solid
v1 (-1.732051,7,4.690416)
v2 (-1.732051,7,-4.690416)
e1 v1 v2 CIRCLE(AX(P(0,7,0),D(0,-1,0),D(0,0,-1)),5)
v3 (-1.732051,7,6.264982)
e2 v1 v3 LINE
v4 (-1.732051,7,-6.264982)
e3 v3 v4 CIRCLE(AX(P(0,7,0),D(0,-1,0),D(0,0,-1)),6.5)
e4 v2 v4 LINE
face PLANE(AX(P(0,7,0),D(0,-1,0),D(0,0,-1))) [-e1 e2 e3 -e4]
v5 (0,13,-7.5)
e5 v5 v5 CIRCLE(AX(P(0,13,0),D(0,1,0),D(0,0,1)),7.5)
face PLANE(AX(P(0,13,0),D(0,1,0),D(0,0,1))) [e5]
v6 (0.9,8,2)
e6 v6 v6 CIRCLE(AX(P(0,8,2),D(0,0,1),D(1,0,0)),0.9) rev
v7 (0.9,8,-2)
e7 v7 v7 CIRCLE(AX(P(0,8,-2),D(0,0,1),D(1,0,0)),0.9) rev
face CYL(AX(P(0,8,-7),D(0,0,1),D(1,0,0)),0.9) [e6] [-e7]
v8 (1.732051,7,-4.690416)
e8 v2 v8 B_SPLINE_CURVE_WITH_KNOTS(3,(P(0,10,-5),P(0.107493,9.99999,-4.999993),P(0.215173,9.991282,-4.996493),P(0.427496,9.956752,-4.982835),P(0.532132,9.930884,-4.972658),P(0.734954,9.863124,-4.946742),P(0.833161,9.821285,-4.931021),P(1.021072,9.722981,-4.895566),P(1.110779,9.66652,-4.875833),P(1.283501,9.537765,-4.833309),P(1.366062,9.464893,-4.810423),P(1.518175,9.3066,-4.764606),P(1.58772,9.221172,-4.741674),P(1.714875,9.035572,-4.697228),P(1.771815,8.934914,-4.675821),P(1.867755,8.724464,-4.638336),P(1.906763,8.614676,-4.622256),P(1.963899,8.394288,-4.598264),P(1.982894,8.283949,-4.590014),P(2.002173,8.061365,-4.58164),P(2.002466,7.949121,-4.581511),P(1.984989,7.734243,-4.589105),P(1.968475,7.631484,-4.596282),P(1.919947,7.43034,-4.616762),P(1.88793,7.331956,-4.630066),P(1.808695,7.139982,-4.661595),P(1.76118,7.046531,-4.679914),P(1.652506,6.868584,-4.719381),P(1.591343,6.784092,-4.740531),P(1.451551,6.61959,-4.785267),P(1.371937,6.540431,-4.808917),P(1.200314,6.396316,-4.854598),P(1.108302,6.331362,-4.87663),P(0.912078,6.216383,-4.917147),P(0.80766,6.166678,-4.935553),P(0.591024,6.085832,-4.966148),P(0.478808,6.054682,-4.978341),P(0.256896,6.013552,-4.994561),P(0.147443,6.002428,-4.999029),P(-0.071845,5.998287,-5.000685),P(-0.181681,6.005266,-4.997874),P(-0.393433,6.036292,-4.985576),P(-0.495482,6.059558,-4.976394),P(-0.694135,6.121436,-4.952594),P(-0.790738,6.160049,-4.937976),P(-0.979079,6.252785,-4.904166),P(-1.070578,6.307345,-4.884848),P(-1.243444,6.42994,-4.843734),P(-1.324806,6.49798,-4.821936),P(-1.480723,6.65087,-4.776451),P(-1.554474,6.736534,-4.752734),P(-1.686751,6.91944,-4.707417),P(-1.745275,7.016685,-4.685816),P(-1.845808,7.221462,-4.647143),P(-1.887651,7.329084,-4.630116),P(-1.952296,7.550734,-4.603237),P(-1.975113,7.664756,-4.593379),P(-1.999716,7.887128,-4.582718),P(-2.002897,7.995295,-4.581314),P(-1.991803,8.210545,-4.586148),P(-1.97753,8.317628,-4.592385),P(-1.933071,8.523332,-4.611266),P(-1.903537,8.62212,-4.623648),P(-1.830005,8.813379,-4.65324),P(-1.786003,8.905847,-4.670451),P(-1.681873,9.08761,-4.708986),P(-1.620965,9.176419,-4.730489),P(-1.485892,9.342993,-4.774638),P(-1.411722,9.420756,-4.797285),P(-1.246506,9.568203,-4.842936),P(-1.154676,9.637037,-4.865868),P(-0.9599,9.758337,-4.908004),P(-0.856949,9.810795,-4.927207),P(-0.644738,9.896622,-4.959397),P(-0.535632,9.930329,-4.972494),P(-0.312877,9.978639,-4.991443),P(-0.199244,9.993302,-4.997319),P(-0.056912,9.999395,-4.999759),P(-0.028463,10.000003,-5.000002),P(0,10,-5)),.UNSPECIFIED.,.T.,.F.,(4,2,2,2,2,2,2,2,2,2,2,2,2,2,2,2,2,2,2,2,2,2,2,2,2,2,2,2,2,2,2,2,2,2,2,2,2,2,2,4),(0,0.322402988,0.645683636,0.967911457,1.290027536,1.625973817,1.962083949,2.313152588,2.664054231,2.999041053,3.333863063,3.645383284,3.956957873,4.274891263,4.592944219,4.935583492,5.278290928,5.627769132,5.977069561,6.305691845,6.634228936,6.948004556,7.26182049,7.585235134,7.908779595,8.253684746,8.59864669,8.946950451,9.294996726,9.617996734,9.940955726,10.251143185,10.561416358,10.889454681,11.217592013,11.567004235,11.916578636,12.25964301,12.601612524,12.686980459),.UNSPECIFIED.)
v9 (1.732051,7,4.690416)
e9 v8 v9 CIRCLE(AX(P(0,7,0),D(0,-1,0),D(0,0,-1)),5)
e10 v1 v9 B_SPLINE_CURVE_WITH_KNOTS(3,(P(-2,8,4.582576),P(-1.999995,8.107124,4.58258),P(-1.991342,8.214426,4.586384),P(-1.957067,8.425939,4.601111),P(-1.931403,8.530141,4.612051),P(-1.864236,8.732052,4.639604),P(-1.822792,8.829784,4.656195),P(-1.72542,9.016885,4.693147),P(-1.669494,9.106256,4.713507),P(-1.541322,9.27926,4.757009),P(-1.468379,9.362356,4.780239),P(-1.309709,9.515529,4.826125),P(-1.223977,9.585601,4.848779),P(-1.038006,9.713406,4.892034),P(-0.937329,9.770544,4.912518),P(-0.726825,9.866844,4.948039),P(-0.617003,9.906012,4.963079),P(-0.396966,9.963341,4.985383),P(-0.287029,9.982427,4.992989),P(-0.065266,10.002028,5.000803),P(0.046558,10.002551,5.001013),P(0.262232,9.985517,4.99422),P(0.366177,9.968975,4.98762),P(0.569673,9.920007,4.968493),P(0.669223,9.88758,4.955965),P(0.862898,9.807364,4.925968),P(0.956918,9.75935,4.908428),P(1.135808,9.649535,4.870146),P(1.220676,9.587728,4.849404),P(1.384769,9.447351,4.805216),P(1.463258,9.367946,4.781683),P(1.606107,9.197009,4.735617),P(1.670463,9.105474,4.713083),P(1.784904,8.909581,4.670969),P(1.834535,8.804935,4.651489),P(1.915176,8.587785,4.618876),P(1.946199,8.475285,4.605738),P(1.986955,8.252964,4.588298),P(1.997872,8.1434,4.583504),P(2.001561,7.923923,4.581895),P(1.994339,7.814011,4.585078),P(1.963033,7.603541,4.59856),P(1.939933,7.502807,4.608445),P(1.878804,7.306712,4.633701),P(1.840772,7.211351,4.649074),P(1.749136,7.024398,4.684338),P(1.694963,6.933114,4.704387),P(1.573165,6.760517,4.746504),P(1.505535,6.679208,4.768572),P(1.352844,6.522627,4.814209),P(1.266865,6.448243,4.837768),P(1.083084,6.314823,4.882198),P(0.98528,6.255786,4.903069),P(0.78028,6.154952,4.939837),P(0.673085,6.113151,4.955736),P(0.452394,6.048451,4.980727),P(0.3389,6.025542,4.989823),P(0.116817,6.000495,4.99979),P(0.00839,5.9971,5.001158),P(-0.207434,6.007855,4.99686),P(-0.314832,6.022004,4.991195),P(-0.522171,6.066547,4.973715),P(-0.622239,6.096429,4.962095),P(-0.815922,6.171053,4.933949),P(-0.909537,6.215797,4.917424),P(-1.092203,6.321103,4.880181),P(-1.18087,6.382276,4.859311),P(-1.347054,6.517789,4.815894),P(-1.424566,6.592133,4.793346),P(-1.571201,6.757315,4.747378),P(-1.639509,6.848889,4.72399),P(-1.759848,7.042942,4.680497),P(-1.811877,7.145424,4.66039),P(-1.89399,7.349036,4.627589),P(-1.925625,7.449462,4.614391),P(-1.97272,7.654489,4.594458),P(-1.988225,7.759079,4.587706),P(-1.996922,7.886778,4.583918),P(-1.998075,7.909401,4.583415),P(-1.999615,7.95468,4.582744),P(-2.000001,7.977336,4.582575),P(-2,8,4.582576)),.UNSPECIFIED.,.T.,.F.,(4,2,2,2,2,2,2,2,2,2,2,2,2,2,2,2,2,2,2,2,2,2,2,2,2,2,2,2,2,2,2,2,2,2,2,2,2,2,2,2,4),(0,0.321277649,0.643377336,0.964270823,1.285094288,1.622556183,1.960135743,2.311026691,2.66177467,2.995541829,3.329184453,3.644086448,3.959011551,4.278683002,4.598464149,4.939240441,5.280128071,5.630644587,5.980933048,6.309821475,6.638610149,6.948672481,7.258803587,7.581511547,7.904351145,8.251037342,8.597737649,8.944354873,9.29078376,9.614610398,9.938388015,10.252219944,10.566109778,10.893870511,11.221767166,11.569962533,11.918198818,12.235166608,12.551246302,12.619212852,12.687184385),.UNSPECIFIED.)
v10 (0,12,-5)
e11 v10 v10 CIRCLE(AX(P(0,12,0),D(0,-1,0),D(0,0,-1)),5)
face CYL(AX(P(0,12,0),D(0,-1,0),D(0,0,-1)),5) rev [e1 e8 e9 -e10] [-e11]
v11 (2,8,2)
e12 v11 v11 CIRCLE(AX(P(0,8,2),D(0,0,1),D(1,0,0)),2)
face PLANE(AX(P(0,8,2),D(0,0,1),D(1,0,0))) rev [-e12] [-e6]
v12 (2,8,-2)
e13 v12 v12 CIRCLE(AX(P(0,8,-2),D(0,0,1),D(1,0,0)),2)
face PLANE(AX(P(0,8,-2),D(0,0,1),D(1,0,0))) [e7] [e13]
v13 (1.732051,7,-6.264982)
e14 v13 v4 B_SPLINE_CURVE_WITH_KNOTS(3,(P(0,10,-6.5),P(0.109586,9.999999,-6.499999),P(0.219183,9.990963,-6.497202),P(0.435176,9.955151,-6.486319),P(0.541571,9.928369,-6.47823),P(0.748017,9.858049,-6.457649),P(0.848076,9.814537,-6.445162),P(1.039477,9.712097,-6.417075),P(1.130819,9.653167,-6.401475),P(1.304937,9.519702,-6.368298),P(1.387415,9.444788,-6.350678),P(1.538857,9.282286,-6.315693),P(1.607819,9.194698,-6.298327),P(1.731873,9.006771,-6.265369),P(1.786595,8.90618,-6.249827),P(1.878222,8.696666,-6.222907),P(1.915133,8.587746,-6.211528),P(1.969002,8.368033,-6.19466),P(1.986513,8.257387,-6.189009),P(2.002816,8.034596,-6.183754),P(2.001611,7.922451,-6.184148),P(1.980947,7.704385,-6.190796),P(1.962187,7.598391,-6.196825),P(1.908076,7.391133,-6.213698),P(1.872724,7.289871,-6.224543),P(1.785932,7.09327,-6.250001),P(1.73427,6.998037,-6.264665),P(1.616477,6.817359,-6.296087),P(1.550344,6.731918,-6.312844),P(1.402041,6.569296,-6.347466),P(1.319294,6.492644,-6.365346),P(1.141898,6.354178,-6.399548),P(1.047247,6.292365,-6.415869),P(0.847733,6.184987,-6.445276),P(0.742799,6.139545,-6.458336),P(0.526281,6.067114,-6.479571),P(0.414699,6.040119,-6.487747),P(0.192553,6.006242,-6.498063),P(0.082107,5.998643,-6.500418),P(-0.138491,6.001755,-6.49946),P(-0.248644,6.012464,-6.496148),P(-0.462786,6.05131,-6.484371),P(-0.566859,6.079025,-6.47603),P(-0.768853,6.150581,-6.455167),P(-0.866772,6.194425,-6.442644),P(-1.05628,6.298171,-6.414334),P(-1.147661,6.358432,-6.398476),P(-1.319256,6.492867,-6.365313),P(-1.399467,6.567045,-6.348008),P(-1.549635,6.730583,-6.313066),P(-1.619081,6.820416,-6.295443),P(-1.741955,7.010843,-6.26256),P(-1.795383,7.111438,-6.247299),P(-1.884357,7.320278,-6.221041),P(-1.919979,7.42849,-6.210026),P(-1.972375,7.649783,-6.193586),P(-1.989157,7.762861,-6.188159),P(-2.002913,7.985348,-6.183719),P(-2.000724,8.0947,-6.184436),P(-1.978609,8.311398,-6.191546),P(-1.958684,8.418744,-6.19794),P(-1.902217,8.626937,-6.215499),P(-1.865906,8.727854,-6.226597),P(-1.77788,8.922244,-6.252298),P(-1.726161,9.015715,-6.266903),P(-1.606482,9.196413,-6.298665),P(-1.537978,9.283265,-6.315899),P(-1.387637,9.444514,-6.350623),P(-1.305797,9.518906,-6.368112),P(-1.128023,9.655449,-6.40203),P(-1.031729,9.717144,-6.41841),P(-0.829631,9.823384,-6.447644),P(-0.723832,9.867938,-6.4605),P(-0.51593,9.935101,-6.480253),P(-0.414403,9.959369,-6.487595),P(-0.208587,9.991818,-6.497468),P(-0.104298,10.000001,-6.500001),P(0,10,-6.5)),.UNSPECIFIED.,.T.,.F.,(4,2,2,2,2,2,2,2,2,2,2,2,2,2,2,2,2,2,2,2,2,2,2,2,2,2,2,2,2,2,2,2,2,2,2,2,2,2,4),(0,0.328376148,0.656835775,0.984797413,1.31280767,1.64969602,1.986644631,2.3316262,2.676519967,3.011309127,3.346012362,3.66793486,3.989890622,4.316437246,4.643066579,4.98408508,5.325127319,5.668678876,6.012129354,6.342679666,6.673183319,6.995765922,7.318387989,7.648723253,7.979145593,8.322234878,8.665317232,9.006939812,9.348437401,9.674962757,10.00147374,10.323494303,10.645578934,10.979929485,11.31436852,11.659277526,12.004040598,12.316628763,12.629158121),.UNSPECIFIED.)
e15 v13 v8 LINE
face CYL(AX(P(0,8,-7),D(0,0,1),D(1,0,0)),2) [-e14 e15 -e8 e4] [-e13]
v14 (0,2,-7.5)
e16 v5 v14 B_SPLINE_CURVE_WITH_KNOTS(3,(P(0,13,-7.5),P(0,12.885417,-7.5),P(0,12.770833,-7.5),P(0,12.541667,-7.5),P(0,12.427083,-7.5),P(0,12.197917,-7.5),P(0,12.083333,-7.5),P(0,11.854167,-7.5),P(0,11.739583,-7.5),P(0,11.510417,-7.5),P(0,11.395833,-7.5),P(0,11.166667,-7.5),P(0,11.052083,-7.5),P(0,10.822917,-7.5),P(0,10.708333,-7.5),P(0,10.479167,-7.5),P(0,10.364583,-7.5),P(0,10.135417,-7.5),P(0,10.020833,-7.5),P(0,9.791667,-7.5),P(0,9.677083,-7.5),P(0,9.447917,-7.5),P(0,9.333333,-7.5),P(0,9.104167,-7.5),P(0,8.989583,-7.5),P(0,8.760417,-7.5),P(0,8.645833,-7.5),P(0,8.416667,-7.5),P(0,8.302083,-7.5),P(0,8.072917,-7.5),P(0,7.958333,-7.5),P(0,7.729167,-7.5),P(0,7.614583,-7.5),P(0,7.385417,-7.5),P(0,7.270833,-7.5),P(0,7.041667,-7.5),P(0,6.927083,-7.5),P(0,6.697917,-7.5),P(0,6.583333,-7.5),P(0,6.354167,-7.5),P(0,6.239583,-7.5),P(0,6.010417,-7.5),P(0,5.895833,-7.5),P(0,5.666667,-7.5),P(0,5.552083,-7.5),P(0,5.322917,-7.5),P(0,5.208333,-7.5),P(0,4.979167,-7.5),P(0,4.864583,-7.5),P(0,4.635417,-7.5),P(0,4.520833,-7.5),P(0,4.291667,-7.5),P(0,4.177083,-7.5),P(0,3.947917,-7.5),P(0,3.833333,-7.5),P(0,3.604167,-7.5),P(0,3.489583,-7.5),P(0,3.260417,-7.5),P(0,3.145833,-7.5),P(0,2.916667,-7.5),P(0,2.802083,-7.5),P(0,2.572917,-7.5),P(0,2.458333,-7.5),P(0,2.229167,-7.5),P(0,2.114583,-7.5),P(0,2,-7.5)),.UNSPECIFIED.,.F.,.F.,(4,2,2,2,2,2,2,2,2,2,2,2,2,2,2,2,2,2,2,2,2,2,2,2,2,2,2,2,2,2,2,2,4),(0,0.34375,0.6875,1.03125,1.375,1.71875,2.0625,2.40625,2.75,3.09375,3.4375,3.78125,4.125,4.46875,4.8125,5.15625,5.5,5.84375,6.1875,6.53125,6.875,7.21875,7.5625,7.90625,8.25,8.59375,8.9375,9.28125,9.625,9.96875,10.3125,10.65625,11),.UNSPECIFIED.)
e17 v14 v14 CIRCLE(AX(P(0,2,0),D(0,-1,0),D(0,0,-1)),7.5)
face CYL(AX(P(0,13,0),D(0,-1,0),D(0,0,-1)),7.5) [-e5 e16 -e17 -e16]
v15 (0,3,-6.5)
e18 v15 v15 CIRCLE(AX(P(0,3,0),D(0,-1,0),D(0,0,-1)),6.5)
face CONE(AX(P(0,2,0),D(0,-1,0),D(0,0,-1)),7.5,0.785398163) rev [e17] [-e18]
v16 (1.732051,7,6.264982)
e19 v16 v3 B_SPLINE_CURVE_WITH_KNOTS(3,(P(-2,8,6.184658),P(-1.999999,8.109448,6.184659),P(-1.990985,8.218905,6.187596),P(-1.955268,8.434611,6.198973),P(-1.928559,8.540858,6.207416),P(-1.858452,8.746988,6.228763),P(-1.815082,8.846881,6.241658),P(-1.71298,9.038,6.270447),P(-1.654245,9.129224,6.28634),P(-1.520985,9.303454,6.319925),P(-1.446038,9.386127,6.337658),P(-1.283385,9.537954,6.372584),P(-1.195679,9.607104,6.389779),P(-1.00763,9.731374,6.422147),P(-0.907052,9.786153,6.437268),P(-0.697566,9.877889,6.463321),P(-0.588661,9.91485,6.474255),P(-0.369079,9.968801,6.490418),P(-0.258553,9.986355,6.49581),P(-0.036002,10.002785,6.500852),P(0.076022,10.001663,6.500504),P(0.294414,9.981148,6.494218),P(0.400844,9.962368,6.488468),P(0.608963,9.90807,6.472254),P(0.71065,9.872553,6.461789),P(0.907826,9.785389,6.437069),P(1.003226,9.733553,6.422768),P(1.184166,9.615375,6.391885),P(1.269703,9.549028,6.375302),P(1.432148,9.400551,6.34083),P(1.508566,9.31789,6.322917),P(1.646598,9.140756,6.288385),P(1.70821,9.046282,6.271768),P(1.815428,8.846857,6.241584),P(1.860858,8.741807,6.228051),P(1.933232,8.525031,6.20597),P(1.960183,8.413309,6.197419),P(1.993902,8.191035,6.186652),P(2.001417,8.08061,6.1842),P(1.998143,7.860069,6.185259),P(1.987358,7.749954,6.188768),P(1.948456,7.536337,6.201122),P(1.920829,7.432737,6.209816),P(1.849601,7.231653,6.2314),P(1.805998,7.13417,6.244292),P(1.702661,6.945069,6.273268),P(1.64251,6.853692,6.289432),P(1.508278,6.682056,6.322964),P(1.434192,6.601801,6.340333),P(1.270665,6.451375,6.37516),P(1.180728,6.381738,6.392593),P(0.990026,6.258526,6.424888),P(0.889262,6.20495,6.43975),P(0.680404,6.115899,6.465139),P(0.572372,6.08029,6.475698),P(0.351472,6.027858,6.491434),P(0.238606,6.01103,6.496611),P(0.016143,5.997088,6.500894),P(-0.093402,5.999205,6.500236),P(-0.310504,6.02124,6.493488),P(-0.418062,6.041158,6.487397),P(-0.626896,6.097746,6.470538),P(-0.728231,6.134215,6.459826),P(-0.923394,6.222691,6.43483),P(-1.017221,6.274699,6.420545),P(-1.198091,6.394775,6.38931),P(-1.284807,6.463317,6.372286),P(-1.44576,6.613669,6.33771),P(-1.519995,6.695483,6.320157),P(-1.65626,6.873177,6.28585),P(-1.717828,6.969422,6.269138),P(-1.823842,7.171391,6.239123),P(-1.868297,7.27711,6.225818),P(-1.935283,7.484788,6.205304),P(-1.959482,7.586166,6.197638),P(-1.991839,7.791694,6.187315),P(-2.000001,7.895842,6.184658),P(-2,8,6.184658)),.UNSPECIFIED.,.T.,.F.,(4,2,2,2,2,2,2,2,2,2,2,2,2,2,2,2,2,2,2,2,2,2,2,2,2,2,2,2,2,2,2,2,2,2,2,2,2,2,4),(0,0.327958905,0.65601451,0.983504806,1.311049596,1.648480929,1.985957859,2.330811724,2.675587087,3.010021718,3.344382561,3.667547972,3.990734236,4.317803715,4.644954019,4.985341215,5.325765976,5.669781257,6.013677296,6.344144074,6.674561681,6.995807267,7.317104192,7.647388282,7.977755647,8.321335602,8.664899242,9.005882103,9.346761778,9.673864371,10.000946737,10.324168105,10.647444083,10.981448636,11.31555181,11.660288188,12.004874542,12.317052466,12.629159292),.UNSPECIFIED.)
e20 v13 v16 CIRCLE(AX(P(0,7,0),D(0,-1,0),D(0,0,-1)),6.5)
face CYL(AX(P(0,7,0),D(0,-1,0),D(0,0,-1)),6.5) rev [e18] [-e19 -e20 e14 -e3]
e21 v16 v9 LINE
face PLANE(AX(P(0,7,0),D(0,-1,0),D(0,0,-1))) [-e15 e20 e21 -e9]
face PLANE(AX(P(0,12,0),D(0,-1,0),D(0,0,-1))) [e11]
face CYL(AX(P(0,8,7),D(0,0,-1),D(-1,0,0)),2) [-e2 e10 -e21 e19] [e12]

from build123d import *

# Parameters (mm, degrees)
SKETCH1_R           = 7.5
BOSS_EXTRUDE1_DEPTH = 13
SKETCH2_R           = 6.5
CUT_EXTRUDE1_DEPTH  = 7
SKETCH3_W           = 8
SKETCH3_H           = 5
CUT_EXTRUDE2_DEPTH  = 5
SKETCH5_R           = 5
CUT_EXTRUDE5_DEPTH  = 5
SKETCH7_R           = 0.9
BOSS_EXTRUDE4_DEPTH = 14
SKETCH10_R          = 2
BOSS_EXTRUDE5_DEPTH = 5
BOSS_EXTRUDE6_START = -5
SKETCH11_R          = 2
BOSS_EXTRUDE6_DEPTH = 5
SKETCH13_R          = 7.5
CUT_EXTRUDE6_DEPTH  = 2
CHAMFER1_SIZE       = 1


with BuildPart() as part:
    # Sketch1 → Boss-Extrude1 (new body)
    with BuildSketch(Plane(origin=(0, 0, 0), x_dir=(1, 0, 0), z_dir=(0, 1, 0))):
        with Locations(Location((0, 0, 0), (0, 0, 90))):
            Circle(SKETCH1_R)
    extrude(amount=BOSS_EXTRUDE1_DEPTH)

    # Sketch2 → Cut-Extrude1 (cut)
    with BuildSketch(Plane.XZ):
        with Locations(Location((0, 0, 0), (0, 0, 270))):
            Circle(SKETCH2_R)
    extrude(amount=-CUT_EXTRUDE1_DEPTH, mode=Mode.SUBTRACT)

    # Sketch3 → Cut-Extrude2 (cut)
    with BuildSketch(Plane.XZ.offset(-7)):
        Rectangle(SKETCH3_W, SKETCH3_H)
    extrude(amount=-CUT_EXTRUDE2_DEPTH, mode=Mode.SUBTRACT)

    # Sketch5 → Cut-Extrude5 (cut)
    with BuildSketch(Plane.XZ.offset(-7)):
        with Locations(Location((0, 0, 0), (0, 0, 270))):
            Circle(SKETCH5_R)
    extrude(amount=-CUT_EXTRUDE5_DEPTH, mode=Mode.SUBTRACT)

    # Sketch7 → Boss-Extrude4 (add)
    with BuildSketch(Plane.XY.offset(7)):
        with Locations((0, 8)):
            Circle(SKETCH7_R)
    extrude(amount=-BOSS_EXTRUDE4_DEPTH)

    # Sketch10 → Boss-Extrude5 (add)
    with BuildSketch(Plane.XY.offset(2)):
        with Locations(Location((0, 8, 0), (0, 0, 209.999999411))):
            Circle(SKETCH10_R)
    extrude(amount=BOSS_EXTRUDE5_DEPTH)

    # Sketch11 → Boss-Extrude6 (add)
    with BuildSketch(Plane.XY.offset(-2).offset(BOSS_EXTRUDE6_START)):
        with Locations(Location((0, 8, 0), (0, 0, 209.999999411))):
            Circle(SKETCH11_R)
    extrude(amount=BOSS_EXTRUDE6_DEPTH)

    # Sketch13 → Cut-Extrude6 (cut)
    with BuildSketch(Plane.XZ):
        with Locations(Location((0, 0, 0), (0, 0, 270))):
            Circle(SKETCH13_R)
    extrude(amount=-CUT_EXTRUDE6_DEPTH, mode=Mode.SUBTRACT)

    # Chamfer1
    chamfer1_edges = [part.edges().sort_by_distance(p)[0] for p in [
        (0, 2, 6.5),
    ]]
    chamfer(chamfer1_edges, length=CHAMFER1_SIZE - 0.0001)  # a hair under: the kernel refuses the full size


solid = part.part
